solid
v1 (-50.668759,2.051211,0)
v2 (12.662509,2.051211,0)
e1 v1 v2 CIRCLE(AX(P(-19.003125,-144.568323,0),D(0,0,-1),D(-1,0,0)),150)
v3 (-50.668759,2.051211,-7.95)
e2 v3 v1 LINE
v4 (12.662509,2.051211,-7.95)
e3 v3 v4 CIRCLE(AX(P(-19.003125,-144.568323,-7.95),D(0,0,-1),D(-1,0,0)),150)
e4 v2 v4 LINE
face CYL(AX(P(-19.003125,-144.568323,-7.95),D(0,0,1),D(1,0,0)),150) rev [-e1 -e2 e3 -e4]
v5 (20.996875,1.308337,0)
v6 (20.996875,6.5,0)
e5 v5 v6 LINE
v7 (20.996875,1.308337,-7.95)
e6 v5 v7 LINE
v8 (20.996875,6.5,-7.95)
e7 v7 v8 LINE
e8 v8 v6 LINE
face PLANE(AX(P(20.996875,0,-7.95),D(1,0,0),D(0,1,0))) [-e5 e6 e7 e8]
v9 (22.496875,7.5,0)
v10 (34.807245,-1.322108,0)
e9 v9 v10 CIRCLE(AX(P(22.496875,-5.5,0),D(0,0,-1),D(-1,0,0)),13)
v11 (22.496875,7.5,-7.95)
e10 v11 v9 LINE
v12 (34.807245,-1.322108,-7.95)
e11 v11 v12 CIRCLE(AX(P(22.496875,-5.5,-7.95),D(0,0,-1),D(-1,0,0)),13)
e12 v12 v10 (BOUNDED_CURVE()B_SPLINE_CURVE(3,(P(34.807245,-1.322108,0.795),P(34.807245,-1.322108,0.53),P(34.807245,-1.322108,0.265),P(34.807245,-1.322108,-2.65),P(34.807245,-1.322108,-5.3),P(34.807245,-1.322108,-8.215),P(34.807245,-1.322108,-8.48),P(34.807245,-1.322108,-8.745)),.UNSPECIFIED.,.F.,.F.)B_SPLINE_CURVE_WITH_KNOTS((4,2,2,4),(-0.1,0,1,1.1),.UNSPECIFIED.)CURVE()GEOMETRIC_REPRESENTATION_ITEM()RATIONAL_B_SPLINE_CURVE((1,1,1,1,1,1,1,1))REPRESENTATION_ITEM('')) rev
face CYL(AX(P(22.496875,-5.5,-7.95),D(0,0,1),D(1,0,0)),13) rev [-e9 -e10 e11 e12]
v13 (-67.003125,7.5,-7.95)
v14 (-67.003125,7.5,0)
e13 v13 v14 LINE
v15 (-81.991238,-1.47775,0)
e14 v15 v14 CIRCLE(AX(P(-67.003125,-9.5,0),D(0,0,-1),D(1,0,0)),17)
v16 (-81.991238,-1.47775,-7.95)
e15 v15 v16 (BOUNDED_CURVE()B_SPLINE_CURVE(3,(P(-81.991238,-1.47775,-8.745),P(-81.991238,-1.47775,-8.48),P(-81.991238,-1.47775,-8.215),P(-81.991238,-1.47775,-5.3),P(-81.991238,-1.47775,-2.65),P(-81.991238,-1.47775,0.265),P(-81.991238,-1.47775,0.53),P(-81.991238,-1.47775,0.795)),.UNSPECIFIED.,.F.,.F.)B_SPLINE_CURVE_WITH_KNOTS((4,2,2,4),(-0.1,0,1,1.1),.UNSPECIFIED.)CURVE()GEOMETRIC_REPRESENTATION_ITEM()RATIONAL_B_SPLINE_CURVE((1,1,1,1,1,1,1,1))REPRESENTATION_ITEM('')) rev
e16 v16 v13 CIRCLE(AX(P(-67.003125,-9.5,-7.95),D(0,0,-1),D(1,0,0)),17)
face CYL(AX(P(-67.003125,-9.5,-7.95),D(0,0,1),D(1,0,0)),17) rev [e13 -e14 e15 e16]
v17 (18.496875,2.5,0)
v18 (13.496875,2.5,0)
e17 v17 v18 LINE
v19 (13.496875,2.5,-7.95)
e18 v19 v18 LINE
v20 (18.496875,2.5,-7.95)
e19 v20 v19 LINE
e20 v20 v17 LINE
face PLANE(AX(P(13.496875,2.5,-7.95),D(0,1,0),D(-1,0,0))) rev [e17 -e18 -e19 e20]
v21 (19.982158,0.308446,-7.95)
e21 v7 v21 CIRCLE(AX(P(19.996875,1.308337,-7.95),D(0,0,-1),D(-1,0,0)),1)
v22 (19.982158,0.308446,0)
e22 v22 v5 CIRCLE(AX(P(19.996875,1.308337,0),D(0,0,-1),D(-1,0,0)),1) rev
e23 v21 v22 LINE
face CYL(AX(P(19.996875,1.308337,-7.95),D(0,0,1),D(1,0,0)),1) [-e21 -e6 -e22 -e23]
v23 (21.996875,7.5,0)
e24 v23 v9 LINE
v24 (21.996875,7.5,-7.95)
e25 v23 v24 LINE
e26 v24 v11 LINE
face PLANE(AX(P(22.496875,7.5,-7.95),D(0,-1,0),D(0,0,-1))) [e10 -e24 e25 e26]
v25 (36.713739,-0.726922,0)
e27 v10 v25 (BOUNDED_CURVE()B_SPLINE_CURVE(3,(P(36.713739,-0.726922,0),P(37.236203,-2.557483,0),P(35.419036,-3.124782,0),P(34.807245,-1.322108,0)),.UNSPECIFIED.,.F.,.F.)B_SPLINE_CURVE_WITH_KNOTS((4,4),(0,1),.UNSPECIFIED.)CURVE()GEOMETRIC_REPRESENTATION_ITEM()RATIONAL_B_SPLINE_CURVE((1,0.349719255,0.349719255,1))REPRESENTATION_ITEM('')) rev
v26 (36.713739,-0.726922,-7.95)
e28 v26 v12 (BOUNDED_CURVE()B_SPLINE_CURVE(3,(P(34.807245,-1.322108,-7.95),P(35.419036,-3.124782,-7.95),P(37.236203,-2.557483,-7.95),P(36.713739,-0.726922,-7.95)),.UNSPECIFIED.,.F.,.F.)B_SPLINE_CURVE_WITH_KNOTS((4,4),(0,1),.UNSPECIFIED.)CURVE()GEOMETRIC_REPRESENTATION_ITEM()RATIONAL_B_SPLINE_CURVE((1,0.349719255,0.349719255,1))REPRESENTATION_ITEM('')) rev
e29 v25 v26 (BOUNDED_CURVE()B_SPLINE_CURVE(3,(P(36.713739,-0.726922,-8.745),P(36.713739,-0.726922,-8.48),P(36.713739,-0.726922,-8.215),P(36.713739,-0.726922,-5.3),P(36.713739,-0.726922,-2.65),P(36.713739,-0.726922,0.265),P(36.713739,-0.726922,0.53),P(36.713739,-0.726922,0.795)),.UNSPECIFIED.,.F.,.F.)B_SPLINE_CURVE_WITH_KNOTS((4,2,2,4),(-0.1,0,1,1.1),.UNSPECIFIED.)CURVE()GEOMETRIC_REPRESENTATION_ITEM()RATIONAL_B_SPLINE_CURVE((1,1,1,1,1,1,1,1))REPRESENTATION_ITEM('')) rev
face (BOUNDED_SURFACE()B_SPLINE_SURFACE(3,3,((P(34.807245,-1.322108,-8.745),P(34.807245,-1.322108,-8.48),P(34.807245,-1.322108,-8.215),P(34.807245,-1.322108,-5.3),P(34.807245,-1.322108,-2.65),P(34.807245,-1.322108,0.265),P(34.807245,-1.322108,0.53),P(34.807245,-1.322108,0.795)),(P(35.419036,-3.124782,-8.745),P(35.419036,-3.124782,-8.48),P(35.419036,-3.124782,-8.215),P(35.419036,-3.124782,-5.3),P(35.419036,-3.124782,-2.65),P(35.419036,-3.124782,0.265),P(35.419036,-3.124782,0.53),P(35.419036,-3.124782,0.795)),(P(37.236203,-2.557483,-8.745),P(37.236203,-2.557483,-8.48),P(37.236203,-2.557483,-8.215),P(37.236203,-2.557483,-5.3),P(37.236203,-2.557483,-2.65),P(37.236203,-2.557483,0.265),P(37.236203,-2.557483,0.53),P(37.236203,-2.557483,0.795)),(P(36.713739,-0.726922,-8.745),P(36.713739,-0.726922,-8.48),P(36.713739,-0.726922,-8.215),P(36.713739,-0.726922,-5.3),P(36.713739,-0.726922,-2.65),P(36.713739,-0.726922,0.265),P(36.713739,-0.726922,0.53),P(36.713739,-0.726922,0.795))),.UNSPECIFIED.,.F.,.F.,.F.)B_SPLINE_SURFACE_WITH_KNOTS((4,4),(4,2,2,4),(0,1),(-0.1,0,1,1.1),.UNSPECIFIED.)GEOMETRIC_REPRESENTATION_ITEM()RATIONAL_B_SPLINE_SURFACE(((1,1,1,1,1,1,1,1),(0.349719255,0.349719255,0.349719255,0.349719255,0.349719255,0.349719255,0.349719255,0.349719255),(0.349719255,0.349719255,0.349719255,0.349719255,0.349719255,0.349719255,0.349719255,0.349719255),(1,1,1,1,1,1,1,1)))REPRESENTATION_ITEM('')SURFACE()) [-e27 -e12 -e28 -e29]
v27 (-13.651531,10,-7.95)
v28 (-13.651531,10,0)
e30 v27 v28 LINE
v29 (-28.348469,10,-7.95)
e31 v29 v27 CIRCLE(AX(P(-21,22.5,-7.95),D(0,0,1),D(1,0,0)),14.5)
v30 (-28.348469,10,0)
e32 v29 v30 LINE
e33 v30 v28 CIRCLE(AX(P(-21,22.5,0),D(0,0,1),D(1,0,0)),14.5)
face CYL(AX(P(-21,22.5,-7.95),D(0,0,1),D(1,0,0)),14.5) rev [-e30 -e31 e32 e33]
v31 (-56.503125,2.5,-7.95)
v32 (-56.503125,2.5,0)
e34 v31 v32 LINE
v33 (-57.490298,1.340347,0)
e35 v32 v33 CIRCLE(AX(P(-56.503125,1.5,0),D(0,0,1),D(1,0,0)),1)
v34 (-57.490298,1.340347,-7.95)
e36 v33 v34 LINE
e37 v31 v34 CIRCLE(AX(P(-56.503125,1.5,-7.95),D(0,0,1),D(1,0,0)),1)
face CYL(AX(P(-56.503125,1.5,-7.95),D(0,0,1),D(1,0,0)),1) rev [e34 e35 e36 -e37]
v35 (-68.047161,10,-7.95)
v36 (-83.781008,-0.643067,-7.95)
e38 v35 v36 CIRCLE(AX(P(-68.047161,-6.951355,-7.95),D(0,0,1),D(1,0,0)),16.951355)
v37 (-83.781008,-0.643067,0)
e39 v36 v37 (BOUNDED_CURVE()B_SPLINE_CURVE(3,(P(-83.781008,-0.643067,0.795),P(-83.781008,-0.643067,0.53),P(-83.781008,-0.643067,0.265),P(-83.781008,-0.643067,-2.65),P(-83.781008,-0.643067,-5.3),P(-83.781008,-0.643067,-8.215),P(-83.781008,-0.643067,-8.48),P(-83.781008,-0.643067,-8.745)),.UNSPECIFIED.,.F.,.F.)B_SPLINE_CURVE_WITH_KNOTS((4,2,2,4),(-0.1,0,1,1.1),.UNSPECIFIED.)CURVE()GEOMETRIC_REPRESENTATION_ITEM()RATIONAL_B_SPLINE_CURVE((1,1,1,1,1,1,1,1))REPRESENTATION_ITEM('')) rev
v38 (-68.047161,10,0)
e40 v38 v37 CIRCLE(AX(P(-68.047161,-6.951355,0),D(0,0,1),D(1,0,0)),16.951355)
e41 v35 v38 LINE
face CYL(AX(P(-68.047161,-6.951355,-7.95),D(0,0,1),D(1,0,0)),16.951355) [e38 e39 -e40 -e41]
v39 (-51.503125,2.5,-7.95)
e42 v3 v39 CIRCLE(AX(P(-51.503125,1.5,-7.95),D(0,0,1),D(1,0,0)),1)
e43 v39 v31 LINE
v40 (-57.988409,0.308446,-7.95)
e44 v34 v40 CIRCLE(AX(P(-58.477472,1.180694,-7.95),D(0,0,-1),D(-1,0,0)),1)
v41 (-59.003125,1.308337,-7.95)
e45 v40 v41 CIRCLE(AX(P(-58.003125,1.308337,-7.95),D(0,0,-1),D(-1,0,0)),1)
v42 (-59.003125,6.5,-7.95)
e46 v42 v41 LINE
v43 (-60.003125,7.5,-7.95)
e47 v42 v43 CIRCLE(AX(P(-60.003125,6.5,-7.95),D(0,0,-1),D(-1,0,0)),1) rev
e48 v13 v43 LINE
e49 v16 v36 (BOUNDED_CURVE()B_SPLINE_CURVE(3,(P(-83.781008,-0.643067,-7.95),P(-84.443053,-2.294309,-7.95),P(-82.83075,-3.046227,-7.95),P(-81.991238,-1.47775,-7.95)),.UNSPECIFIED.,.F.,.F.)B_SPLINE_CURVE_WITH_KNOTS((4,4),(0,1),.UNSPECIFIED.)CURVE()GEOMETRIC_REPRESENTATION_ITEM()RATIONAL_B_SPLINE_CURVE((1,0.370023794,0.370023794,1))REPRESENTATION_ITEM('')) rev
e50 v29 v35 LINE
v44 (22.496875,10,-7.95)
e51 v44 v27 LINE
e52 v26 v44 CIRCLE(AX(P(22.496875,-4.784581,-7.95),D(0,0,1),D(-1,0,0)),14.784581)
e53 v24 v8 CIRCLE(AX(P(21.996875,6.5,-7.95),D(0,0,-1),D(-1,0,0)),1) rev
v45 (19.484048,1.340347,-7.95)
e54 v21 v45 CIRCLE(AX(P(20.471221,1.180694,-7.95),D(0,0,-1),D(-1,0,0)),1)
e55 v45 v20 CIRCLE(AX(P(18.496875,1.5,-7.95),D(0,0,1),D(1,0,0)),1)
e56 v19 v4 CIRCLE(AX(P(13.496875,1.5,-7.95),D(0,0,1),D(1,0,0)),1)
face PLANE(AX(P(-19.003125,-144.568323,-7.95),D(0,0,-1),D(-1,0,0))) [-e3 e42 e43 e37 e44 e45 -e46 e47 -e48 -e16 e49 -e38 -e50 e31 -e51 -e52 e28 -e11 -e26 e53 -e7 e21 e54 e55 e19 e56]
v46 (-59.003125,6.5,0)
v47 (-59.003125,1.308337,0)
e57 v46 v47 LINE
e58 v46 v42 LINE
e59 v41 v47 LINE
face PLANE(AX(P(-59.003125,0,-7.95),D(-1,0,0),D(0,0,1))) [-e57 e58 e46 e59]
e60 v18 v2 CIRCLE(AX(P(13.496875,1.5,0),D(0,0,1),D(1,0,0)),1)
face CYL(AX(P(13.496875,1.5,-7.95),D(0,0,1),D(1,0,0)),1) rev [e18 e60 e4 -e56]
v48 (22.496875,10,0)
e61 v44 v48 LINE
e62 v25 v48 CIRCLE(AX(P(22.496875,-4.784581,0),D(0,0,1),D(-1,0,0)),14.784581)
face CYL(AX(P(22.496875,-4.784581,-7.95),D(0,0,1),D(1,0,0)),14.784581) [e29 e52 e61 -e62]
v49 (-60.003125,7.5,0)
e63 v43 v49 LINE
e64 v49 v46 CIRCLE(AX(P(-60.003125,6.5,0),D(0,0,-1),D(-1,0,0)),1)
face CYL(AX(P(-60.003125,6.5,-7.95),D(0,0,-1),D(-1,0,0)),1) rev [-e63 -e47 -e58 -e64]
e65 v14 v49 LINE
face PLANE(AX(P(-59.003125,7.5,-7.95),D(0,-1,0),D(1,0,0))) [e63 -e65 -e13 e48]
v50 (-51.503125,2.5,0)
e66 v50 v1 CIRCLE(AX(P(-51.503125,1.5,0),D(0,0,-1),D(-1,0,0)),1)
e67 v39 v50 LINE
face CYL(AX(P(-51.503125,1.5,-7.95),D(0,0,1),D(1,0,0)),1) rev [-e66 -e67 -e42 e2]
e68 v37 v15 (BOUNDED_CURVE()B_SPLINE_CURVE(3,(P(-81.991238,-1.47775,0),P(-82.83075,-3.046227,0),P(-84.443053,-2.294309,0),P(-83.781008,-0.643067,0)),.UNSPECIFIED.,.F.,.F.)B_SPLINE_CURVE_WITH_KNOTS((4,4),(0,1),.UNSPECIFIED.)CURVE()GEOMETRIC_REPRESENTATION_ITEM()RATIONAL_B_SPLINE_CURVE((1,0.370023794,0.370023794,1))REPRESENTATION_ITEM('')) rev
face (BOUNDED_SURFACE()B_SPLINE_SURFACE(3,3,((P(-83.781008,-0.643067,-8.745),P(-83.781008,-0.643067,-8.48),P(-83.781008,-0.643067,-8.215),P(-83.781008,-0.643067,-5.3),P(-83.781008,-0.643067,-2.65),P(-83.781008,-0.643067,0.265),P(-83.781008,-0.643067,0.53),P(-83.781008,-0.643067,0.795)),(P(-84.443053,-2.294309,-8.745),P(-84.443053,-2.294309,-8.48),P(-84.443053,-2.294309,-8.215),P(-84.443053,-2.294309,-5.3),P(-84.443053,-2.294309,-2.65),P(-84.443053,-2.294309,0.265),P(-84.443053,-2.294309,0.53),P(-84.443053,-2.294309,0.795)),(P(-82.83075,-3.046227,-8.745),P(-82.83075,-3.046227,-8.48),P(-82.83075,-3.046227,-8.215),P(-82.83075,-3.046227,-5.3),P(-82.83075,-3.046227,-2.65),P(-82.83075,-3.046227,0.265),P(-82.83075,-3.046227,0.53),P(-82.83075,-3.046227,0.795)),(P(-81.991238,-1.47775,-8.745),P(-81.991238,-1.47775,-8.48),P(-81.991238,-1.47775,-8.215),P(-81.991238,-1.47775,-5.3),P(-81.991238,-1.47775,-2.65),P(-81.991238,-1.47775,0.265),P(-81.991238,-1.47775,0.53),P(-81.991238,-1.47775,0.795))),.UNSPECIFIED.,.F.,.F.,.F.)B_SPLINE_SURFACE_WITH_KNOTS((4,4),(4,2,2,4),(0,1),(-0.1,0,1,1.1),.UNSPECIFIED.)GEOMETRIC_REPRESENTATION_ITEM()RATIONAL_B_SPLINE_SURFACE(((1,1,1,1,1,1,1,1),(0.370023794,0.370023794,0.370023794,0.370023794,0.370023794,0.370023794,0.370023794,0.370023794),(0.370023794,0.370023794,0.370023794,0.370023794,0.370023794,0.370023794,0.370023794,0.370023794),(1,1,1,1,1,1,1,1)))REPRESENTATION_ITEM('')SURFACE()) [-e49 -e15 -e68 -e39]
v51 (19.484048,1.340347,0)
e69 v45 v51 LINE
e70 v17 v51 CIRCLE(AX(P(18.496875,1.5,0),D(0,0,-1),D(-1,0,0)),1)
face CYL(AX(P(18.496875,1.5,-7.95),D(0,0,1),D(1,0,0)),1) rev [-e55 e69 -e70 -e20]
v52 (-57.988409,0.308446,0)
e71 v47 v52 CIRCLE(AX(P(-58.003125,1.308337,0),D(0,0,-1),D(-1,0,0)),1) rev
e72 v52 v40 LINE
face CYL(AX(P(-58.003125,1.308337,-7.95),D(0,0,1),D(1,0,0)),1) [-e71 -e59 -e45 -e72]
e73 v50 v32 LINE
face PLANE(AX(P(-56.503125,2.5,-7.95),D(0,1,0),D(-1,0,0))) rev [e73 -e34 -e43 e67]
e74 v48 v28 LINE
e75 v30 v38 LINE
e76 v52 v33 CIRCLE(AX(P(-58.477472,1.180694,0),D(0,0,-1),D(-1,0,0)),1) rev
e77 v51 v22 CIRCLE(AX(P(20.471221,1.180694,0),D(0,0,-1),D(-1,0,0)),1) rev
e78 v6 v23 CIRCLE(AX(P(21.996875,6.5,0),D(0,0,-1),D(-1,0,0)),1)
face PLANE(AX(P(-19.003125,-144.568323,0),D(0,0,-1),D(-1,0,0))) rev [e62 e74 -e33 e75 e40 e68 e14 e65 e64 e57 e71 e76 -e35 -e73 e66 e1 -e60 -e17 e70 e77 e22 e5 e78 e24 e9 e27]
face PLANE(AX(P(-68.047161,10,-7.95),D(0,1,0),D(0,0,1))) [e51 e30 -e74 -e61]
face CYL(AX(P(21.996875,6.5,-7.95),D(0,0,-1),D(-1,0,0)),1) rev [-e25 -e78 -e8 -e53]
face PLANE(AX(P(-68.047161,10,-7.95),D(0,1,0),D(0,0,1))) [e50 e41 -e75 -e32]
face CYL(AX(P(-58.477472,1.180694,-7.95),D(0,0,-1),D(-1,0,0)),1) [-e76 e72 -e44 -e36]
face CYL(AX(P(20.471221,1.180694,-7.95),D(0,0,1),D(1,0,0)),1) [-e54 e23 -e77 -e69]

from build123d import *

# Parameters (mm, degrees)
EXTRUDE_1219_DEPTH     = 7.95
CUT_EXTRUDE_1748_DEPTH = 86.222223289
FILLET_1_R             = 1
CUT_EXTRUDE_3045_DEPTH = 86.222223289
FILLET_START           = -9
FILLET_2_DEPTH         = 10
FILLET_3_DEPTH         = 10


with BuildPart() as part:
    # Эскиз1 → Extrude 1219 (new body)
    with BuildSketch(Plane.XY):
        with BuildLine():
            Line((-59.003125249, 0), (-59.003125249, 7.5))
            Line((-59.003125249, 7.5), (-67.003125249, 7.5))
            ThreePointArc((-67.003125249, 7.5), (-75.989225627, 4.93086969), (-82.259271551, -2))
            Line((-82.259271551, -2), (-84.259271551, -2))
            ThreePointArc((-84.259271551, -2), (-78.132206164, 6.673633304), (-68.047161318, 10))
            Line((-68.047161318, 10), (0, 10))
            Line((0, 10), (22.496874751, 10))
            ThreePointArc((22.496874751, 10), (31.915339808, 6.61174951), (37.016858777, -2))
            Line((37.016858777, -2), (35.016858777, -2))
            ThreePointArc((35.016858777, -2), (30.354991574, 4.856157589), (22.496874751, 7.5))
            Line((22.496874751, 7.5), (20.996874751, 7.5))
            Line((20.996874751, 7.5), (20.996874751, 0))
            ThreePointArc((20.996874751, 0), (-19.003125249, 5.431677052), (-59.003125249, 0))
        make_face()
    extrude(amount=-EXTRUDE_1219_DEPTH)

    # Эскиз4 → Cut-Extrude 1748 (cut, through all)
    with BuildSketch(Plane.XY):
        with BuildLine():
            Line((-56.503125249, 2.5), (-51.503125249, 2.5))
            ThreePointArc((-51.503125249, 2.5), (-50.503125249, 1.5), (-51.503125249, 0.5))
            Line((-51.503125249, 0.5), (-56.503125249, 0.5))
            ThreePointArc((-56.503125249, 0.5), (-57.503125249, 1.5), (-56.503125249, 2.5))
        make_face()
        with BuildLine():
            Line((13.496874751, 2.5), (18.496874751, 2.5))
            ThreePointArc((18.496874751, 2.5), (19.496874751, 1.5), (18.496874751, 0.5))
            Line((18.496874751, 0.5), (13.496874751, 0.5))
            ThreePointArc((13.496874751, 0.5), (12.496874751, 1.5), (13.496874751, 2.5))
        make_face()
    extrude(amount=-CUT_EXTRUDE_1748_DEPTH, mode=Mode.SUBTRACT)

    # Скругление1
    # the kernel refuses this fillet: 1 mm, written as the material it adds along each edge
    with BuildSketch(Plane(origin=(20.996874751, 7.5, 0), x_dir=(0, -1, 0), z_dir=(0, 0, -1))) as fillet_1_piece_1:
        with BuildLine():
            CenterArc((FILLET_1_R, -FILLET_1_R), FILLET_1_R, 90, 90)
            Line((0, -FILLET_1_R), (0, 0))
            Line((0, 0), (FILLET_1_R, 0))
        make_face()
    extrude(amount=7.95)
    with BuildSketch(Plane(origin=(-59.003125249, 7.5, 0), x_dir=(0, -1, 0), z_dir=(0, 0, -1))) as fillet_1_piece_2:
        with BuildLine():
            CenterArc((FILLET_1_R, FILLET_1_R), FILLET_1_R, 180, 90)
            Line((0, FILLET_1_R), (0, 0))
            Line((0, 0), (FILLET_1_R, 0))
        make_face()
    extrude(amount=7.95)
    # the kernel refuses this fillet: 1 mm, written as the material it takes off along each edge
    with BuildSketch(Plane(origin=(20.996874751, 0, 3.270843206), x_dir=(-0.9649388241572373, 0.26247488572061173, 0), z_dir=(0, 0, -1))) as fillet_1_2_piece_1:
        with BuildLine():
            CenterArc((1.308344503, 0.999990553), FILLET_1_R, 164.783036074, 104.967917899)
            Line((0.343405679, 1.262465439), (0, 0))
            ThreePointArc((0, 0), (0.651998922, 0.001417015), (1.303997843, 0))
        make_face()
    extrude(amount=14.491686412, mode=Mode.SUBTRACT)
    with BuildSketch(Plane(origin=(-59.003125249, 0, 3.270843206), x_dir=(0, 1, 0), z_dir=(0, 0, -1))) as fillet_1_2_piece_2:
        with BuildLine():
            CenterArc((1.308337282, 1), FILLET_1_R, 165.032082101, 104.967917899)
            ThreePointArc((0.342266685, 1.258278146), (0.172500676, 0.628767142), (0, 0))
            Line((0, 0), (1.308337282, 0))
        make_face()
    extrude(amount=14.491686412, mode=Mode.SUBTRACT)
    with BuildSketch(Plane(origin=(18.869217353, 0.571904645, -11.41789989), x_dir=(0.6247425525309795, 0.7808308030918583, 0), z_dir=(0, 0, 1))) as fillet_1_2_piece_3:
        with BuildLine():
            CenterArc((1.476201521, -0.870557233), FILLET_1_R, 119.476541698, 84.032444608)
            ThreePointArc((0.559203998, -1.26945013), (0.281069449, -0.63407864), (0, 0))
            ThreePointArc((0, 0), (0.492067174, -0.129442767), (0.984134348, 0))
        make_face()
    extrude(amount=14.88579978, mode=Mode.SUBTRACT)
    with BuildSketch(Plane(origin=(-56.87546785, 0.571904645, -11.41789989), x_dir=(-0.9664237291257997, -0.2569536452019758, 0), z_dir=(0, 0, 1))) as fillet_1_2_piece_4:
        with BuildLine():
            CenterArc((1.391783822, -0.99998931), FILLET_1_R, 90.264928981, 84.032444608)
            ThreePointArc((0.396732806, -0.900623947), (0.316825083, -0.398129879), (0, 0))
            ThreePointArc((0, 0), (0.693579978, -0.001603519), (1.387159956, 0))
        make_face()
    extrude(amount=14.88579978, mode=Mode.SUBTRACT)

    # Эскиз3 → Cut-Extrude 3045 (cut, through all)
    with BuildSketch(Plane.XY):
        with BuildLine():
            Line((-28.348469228, 10), (-13.651530772, 10))
            ThreePointArc((-13.651530772, 10), (-21, 8), (-28.348469228, 10))
        make_face()
    extrude(amount=-CUT_EXTRUDE_3045_DEPTH, mode=Mode.SUBTRACT)

    # Скругление2: read off the stored shape, not the designer's step
    # Скругление2 outline → Скругление2 (cut)
    with BuildSketch(Plane.XY.offset(FILLET_START)):
        with BuildLine():
            add(Edge.make_bspline(
                [(-82.863119301, -2), (-82.449925955, -1.99999996), (-82.147973363, -1.770582651), (-81.991237502, -1.477750248)],
                knots=[0.617138018, 0.617138018, 0.617138018, 0.617138018, 1, 1, 1, 1], degree=3, weights=[0.553450152, 0.609956112, 0.758806062, 1]))
            Line((-82.863119301, -2), (-82.259271551, -2))
            ThreePointArc((-82.259271551, -2), (-82.127508876, -1.737718125), (-81.991237502, -1.477750248))
        make_face()
        with BuildLine():
            add(Edge.make_bspline(
                [(-83.781008367, -0.643067451), (-84.028353334, -1.25998415), (-83.741746006, -2.000000086), (-82.863119301, -2)],
                knots=[0, 0, 0, 0, 0.617138018, 0.617138018, 0.617138018, 0.617138018], degree=3, weights=[1, 0.611217733, 0.462367784, 0.553450152]))
            ThreePointArc((-83.781008367, -0.643067451), (-84.03454269, -1.316457352), (-84.259271551, -2))
            Line((-84.259271551, -2), (-82.863119301, -2))
        make_face()
    extrude(amount=FILLET_2_DEPTH, mode=Mode.SUBTRACT)

    # Скругление3: read off the stored shape, not the designer's step
    # Скругление3 outline → Скругление3 (cut)
    with BuildSketch(Plane.XY.offset(FILLET_START)):
        with BuildLine():
            add(Edge.make_bspline(
                [(35.753175475, -2), (36.580087454, -2.000000006), (36.88300902, -1.319995015), (36.713739215, -0.726922424)],
                knots=[0.42186979, 0.42186979, 0.42186979, 0.42186979, 1, 1, 1, 1], degree=3, weights=[0.524198025, 0.465452398, 0.624053056, 1]))
            Line((35.753175475, -2), (37.016858777, -2))
            ThreePointArc((37.016858777, -2), (36.879391808, -1.360105716), (36.713739215, -0.726922424))
        make_face()
        with BuildLine():
            add(Edge.make_bspline(
                [(34.80724517, -1.32210817), (34.931629097, -1.688611726), (35.257891746, -1.999999996), (35.753175475, -2)],
                knots=[0, 0, 0, 0, 0.42186979, 0.42186979, 0.42186979, 0.42186979], degree=3, weights=[1, 0.725666199, 0.567065541, 0.524198025]))
            ThreePointArc((34.80724517, -1.32210817), (34.916677882, -1.65962369), (35.016858777, -2))
            Line((35.016858777, -2), (35.753175475, -2))
        make_face()
    extrude(amount=FILLET_3_DEPTH, mode=Mode.SUBTRACT)


solid = part.part
